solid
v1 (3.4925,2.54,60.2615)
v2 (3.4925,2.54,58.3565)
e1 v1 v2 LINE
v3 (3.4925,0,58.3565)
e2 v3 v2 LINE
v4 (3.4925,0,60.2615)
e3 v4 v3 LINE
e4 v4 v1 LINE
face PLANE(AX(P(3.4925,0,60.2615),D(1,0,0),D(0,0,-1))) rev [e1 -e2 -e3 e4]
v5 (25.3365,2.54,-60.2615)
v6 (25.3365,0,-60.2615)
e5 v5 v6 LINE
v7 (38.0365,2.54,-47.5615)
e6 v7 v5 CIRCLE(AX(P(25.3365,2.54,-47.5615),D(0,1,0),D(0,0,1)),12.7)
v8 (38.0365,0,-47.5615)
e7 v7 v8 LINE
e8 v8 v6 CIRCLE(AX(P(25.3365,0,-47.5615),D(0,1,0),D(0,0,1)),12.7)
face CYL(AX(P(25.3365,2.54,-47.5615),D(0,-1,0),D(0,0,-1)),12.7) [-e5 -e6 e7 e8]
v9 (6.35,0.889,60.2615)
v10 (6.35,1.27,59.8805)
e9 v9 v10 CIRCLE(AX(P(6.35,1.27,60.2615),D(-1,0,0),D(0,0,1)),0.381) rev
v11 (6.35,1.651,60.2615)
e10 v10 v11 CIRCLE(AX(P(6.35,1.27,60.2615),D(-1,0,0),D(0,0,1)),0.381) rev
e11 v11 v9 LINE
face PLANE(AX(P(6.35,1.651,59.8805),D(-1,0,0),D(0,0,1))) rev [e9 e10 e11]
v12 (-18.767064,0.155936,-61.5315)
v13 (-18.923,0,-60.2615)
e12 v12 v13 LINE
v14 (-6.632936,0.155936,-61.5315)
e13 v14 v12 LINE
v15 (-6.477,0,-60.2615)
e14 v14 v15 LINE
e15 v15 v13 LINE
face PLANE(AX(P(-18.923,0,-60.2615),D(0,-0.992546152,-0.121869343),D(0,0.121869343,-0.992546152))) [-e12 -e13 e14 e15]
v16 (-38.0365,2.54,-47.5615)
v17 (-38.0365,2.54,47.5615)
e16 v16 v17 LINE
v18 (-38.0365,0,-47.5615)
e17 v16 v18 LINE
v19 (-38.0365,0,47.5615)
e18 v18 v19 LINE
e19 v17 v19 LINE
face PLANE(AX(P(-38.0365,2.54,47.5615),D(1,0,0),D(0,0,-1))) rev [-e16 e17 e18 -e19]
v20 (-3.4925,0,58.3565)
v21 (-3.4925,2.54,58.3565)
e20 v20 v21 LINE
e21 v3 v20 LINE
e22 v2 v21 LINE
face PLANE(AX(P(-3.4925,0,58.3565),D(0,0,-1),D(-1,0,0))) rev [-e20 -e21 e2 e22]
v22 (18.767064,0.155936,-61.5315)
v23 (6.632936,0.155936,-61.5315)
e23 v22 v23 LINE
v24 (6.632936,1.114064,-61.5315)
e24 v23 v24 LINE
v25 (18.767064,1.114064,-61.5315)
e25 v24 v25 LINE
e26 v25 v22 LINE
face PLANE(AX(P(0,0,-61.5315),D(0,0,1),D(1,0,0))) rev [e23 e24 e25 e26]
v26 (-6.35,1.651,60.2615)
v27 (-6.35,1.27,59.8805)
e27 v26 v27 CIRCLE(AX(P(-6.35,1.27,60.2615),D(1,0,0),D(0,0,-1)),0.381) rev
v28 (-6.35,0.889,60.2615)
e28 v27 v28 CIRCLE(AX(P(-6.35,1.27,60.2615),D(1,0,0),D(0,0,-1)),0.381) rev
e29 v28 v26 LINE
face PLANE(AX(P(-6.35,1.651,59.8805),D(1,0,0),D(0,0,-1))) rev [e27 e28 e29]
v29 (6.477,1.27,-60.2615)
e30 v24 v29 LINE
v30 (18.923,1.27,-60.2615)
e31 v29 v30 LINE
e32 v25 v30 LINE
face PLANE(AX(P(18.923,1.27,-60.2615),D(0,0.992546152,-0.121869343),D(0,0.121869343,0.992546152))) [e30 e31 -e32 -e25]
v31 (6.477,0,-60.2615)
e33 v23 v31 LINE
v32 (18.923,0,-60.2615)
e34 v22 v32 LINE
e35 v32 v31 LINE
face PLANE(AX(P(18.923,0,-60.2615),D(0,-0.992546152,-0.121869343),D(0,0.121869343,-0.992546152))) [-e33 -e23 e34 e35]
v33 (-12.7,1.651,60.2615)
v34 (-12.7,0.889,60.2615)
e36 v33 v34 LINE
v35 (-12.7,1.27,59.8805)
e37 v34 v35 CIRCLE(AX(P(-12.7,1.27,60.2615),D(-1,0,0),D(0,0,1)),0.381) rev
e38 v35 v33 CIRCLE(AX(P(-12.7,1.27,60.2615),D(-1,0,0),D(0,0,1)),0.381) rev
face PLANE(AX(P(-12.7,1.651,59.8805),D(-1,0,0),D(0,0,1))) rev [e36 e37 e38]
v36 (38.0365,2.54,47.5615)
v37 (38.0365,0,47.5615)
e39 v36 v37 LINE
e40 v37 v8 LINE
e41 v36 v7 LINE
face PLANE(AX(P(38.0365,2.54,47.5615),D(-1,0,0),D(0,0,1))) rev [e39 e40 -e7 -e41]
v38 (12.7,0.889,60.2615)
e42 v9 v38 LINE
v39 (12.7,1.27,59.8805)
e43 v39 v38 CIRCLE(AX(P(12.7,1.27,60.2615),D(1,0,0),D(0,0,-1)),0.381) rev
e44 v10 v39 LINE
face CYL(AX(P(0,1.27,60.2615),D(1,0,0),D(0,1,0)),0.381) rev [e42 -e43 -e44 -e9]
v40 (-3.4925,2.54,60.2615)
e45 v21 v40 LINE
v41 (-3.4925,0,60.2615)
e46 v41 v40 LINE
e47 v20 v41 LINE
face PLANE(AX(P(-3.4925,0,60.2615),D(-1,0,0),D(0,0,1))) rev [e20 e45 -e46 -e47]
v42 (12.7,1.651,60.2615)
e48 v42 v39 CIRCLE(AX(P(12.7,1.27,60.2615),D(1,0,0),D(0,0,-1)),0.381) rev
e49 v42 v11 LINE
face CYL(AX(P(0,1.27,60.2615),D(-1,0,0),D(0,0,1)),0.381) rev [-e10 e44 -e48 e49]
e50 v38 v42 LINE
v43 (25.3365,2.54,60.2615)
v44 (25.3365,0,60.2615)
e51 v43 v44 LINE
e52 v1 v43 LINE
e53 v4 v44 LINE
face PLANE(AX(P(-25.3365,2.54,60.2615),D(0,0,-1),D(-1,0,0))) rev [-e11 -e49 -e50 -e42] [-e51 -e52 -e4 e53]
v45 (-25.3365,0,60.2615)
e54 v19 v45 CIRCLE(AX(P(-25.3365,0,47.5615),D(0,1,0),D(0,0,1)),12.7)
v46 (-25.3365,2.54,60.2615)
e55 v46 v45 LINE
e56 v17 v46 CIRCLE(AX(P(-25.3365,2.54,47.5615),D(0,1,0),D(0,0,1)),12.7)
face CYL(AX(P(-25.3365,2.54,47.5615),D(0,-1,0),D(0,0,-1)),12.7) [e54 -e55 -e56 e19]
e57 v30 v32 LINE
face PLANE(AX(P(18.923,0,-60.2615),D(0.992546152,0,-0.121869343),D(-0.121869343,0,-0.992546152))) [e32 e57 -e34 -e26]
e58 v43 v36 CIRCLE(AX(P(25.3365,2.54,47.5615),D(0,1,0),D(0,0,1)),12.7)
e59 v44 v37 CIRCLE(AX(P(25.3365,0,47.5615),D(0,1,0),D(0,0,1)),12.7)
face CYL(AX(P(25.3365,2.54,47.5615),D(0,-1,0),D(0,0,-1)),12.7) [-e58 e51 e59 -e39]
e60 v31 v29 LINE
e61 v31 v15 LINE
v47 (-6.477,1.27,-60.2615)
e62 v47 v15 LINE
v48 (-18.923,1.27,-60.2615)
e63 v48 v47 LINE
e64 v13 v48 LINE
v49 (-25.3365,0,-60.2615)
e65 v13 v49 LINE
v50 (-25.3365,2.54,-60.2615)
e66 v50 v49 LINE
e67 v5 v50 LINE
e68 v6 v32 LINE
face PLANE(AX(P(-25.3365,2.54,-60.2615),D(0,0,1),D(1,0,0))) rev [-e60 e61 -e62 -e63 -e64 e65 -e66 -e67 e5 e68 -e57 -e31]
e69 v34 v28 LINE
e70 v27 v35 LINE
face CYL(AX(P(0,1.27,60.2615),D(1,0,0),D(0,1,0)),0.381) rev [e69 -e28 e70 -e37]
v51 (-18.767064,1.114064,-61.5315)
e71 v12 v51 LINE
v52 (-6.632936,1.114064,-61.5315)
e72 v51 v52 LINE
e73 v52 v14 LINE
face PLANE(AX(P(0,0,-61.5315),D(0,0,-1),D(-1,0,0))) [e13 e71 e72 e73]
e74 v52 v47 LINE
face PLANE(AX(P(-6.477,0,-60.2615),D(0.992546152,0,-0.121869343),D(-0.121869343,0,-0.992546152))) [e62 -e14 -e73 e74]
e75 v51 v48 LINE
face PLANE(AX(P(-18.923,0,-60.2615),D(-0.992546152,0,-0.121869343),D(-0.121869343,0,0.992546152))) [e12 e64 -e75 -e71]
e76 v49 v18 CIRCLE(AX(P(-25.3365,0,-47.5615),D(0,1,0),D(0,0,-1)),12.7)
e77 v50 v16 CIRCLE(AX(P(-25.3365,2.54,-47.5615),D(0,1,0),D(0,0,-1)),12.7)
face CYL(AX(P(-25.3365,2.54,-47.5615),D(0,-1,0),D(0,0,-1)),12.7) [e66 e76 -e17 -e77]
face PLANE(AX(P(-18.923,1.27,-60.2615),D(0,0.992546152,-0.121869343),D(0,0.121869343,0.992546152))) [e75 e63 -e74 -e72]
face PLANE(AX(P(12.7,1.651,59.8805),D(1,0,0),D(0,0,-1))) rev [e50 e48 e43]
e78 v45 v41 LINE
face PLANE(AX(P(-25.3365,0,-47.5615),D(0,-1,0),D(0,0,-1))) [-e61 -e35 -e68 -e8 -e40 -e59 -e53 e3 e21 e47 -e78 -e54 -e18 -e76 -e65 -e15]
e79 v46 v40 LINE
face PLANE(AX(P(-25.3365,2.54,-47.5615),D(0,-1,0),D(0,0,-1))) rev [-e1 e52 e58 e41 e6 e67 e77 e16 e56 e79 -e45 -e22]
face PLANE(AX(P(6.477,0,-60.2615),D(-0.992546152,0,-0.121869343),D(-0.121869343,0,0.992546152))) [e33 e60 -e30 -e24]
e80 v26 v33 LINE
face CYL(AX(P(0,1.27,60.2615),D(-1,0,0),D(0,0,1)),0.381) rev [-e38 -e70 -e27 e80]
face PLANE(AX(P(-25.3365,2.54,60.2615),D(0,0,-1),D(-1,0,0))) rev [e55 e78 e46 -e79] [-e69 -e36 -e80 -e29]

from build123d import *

# Parameters (mm, degrees)
TOP_DEPTH                 = 2.54
SKETCH13_W                = 12.446
SKETCH13_H                = 1.27
BODY_TABS_DEPTH           = 1.27
BODY_TABS_DRAFT           = 7
BODY_TABS_PROFILE_2_DEPTH = 1.27
BODY_TABS_PROFILE_2_DRAFT = 7
SKETCH14_W                = 6.985
SKETCH14_H                = 1.905
FLAT_HEAD_HOLE_DEPTH      = 73.383371188
SKETCH15_W                = 6.35
SKETCH15_H                = 0.762
HOLD_GRPOVES_DEPTH        = 0.381
HOLD_FILLETS_R            = 0.381


with BuildPart() as part:
    # Sketch2 → top (new body)
    with BuildSketch(Plane(origin=(0, 0, 0), x_dir=(1, 0, 0), z_dir=(0, 1, 0))):
        with BuildLine():
            Line((-25.3365, -60.2615), (25.3365, -60.2615))
            ThreePointArc((25.3365, -60.2615), (34.316756121, -56.541756121), (38.0365, -47.5615))
            Line((38.0365, -47.5615), (38.0365, 47.5615))
            ThreePointArc((38.0365, 47.5615), (34.316756121, 56.541756121), (25.3365, 60.2615))
            Line((25.3365, 60.2615), (-25.3365, 60.2615))
            ThreePointArc((-25.3365, 60.2615), (-34.316756121, 56.541756121), (-38.0365, 47.5615))
            Line((-38.0365, 47.5615), (-38.0365, -47.5615))
            ThreePointArc((-38.0365, -47.5615), (-34.316756121, -56.541756121), (-25.3365, -60.2615))
        make_face()
    extrude(amount=TOP_DEPTH)


with BuildPart() as body_tabs_tool:
    # Sketch13 → Body Tabs (with draft: the straight prism first)
    with BuildSketch(Plane(origin=(0, 0, -60.2615), x_dir=(-1, 0, 0), z_dir=(0, 0, -1))):
        with Locations((-12.7, 0.635)):
            Rectangle(SKETCH13_W, SKETCH13_H)
    extrude(amount=BODY_TABS_DEPTH)
    # Body Tabs: the draft: its side faces are tilted about the plane it starts from
    body_tabs_sides = [body_tabs_tool.faces().sort_by_distance(p)[0] for p in [
        (12.7, 0, -60.8965),
        (6.477, 0.635, -60.8965),
        (12.7, 1.27, -60.8965),
        (18.923, 0.635, -60.8965),
    ]]
    draft(body_tabs_sides, Plane(origin=(0, 0, -60.2615), x_dir=(-1, 0, 0), z_dir=(0, 0, -1)), BODY_TABS_DRAFT)


with BuildPart() as part_1:
    add(part.part)

    # Body Tabs: add body_tabs_tool
    add(body_tabs_tool.part)


with BuildPart() as body_tabs_profile_2_tool:
    # Sketch13 → Body Tabs profile 2 (with draft: the straight prism first)
    with BuildSketch(Plane(origin=(0, 0, -60.2615), x_dir=(-1, 0, 0), z_dir=(0, 0, -1))):
        with Locations((12.7, 0.635)):
            Rectangle(SKETCH13_W, SKETCH13_H)
    extrude(amount=BODY_TABS_PROFILE_2_DEPTH)
    # Body Tabs profile 2: the draft: its side faces are tilted about the plane it starts from
    body_tabs_profile_2_sides = [body_tabs_profile_2_tool.faces().sort_by_distance(p)[0] for p in [
        (-18.923, 0.635, -60.8965),
        (-12.7, 1.27, -60.8965),
        (-6.477, 0.635, -60.8965),
        (-12.7, 0, -60.8965),
    ]]
    draft(body_tabs_profile_2_sides, Plane(origin=(0, 0, -60.2615), x_dir=(-1, 0, 0), z_dir=(0, 0, -1)), BODY_TABS_PROFILE_2_DRAFT)


with BuildPart() as part_2:
    add(part_1.part)

    # Body Tabs profile 2: add body_tabs_profile_2_tool
    add(body_tabs_profile_2_tool.part)

    # Sketch14 → Flat Head Hole (cut, through all)
    with BuildSketch(Plane(origin=(0, 2.54, 0), x_dir=(1, 0, 0), z_dir=(0, 1, 0))):
        with Locations((0, -59.309)):
            Rectangle(SKETCH14_W, SKETCH14_H)
    extrude(amount=-FLAT_HEAD_HOLE_DEPTH, mode=Mode.SUBTRACT)

    # Sketch15 → Hold Grpoves (cut)
    with BuildSketch(Plane.XY.offset(60.2615)):
        with Locations((-9.525, 1.27)):
            Rectangle(SKETCH15_W, SKETCH15_H)
        with Locations((9.525, 1.27)):
            Rectangle(SKETCH15_W, SKETCH15_H)
    extrude(amount=-HOLD_GRPOVES_DEPTH, mode=Mode.SUBTRACT)

    # Hold Fillets
    hold_fillets_edges = [part_2.edges().sort_by_distance(p)[0] for p in [
        (9.525, 1.651, 59.8805),
        (9.525, 0.889, 59.8805),
        (-9.525, 0.889, 59.8805),
        (-9.525, 1.651, 59.8805),
    ]]
    fillet(hold_fillets_edges, radius=HOLD_FILLETS_R - 0.0001)  # a hair under: the kernel refuses the full size


solid = part_2.part
